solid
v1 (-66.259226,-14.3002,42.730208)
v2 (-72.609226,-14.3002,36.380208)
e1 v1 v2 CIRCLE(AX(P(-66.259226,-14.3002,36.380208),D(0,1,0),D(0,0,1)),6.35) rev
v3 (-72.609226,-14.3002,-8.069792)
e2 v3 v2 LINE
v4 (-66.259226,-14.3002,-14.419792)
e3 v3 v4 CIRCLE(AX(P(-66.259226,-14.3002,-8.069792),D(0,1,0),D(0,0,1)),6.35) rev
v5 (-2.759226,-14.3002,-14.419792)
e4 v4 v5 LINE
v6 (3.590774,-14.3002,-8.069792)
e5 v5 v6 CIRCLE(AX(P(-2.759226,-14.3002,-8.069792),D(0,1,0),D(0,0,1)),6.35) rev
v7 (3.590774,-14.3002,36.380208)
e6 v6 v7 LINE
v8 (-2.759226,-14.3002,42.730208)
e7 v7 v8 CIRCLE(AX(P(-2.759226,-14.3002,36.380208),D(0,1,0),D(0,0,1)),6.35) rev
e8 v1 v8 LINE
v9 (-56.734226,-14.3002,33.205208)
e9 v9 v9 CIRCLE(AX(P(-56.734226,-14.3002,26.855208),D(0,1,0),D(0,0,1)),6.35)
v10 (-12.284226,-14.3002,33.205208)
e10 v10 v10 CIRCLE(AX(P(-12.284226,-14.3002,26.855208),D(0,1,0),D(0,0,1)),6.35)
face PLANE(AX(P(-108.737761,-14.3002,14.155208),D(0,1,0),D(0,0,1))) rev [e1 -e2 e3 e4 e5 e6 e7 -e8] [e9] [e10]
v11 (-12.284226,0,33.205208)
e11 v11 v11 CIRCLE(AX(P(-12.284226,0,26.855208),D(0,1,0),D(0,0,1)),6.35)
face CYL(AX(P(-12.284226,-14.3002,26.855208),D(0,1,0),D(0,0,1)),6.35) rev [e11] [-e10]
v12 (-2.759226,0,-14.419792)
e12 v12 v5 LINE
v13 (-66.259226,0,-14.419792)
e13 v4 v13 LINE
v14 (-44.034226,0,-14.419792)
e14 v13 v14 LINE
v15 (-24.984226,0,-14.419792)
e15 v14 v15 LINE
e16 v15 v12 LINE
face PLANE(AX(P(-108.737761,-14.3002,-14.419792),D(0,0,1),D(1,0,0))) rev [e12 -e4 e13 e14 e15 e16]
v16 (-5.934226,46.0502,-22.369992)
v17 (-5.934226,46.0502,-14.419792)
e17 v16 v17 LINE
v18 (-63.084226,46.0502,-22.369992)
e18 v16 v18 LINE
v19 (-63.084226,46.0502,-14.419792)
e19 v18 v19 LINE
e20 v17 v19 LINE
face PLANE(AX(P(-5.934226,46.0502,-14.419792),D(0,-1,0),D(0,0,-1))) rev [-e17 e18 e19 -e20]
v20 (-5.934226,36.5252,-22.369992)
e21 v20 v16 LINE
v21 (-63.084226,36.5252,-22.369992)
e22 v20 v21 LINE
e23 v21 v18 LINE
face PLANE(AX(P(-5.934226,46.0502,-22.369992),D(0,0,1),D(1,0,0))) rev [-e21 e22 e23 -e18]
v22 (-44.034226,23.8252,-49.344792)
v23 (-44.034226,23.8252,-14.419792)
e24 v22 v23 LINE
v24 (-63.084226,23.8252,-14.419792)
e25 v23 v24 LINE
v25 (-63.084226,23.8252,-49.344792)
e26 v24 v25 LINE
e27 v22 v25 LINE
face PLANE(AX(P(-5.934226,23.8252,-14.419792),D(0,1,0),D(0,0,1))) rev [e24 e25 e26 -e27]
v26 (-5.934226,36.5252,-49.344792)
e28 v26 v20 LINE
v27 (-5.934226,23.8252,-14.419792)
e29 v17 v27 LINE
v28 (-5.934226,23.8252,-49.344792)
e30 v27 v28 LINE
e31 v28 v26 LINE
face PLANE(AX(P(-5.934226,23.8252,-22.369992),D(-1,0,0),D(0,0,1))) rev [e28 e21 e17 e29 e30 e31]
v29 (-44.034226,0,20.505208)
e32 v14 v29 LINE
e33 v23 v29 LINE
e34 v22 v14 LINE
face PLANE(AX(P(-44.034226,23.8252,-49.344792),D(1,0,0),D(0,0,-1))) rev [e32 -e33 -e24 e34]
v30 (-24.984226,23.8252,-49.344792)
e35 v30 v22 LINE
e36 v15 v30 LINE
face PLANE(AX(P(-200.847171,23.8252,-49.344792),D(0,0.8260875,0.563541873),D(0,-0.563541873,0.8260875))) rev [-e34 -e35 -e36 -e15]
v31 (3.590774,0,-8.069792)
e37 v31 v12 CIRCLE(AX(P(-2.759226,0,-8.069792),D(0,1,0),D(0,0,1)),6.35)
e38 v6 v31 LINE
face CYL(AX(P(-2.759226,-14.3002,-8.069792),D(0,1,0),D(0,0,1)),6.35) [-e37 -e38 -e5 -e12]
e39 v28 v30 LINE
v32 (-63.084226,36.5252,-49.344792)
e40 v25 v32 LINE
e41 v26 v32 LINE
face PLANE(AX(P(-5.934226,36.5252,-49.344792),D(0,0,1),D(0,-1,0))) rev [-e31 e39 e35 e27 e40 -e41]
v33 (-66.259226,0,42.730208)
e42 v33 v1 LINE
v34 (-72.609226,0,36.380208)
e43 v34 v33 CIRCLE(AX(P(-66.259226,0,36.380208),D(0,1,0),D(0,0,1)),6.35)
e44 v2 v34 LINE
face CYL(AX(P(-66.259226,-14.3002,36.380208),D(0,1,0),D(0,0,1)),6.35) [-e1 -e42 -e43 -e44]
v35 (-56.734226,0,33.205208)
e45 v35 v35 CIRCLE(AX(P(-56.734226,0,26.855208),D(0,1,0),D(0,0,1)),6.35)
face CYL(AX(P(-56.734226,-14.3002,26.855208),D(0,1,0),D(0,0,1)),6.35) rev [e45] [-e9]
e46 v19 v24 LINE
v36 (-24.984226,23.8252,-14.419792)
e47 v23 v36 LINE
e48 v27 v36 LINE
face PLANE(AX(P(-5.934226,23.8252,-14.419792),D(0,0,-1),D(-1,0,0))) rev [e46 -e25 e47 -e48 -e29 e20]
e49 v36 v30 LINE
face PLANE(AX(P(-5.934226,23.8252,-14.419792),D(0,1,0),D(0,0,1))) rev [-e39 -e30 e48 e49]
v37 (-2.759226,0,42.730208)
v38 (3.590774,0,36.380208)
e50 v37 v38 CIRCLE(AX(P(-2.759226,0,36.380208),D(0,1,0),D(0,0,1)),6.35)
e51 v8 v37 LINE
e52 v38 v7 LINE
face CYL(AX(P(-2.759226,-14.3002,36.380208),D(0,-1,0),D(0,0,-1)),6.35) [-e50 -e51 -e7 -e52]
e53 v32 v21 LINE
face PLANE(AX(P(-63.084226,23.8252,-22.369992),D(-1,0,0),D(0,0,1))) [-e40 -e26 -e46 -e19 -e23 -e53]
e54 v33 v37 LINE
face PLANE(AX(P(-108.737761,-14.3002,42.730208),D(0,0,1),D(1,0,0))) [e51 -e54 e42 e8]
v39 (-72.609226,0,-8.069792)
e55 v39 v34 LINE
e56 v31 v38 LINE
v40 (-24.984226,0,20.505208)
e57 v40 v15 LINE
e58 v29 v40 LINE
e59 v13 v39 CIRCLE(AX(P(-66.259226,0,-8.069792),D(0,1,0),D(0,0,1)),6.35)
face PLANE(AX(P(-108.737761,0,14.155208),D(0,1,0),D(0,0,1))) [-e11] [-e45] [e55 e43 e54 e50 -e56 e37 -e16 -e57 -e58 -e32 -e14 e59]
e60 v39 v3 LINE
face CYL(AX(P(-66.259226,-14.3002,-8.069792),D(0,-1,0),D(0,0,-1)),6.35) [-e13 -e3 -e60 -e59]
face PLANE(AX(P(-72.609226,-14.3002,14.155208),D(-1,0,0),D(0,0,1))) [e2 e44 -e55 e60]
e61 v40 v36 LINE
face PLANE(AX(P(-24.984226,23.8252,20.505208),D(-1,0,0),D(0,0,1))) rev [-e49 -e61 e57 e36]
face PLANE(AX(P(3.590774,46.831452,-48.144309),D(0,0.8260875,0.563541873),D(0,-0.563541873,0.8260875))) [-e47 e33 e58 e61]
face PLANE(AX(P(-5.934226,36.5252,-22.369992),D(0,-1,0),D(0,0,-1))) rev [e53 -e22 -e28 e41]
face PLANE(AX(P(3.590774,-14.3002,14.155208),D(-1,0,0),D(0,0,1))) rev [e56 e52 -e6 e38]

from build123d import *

# Parameters (mm, degrees)
SKETCH1_R               = 6.35
SKETCH1_W               = 19.05
SKETCH1_H               = 25.985863096
EXTRUDE2_DEPTH          = 14.3002
SKETCH2_W               = 19.05
SKETCH2_H               = 69.85
EXTRUDE3_DEPTH          = 23.8252
CUT_EXTRUDE1_DEPTH      = 73.599512703
CUT_EXTRUDE1_DEPTH_BACK = 73.599512703
CUT_EXTRUDE2_START      = -19.05
CUT_EXTRUDE2_DEPTH      = 19.05
EXTRUDE4_DEPTH          = 19.05
EXTRUDE4_DEPTH_BACK     = 38.1
FILLET1_R               = 6.35


# Read off the part's stored shape, not the designer's step: Cut-Extrude2
with BuildPart() as part:
    # Sketch1 → Extrude2 (new body)
    # profile 1 of 2: a face of its own
    with BuildSketch(Plane(origin=(0, 0, 0), x_dir=(1, 0, 0), z_dir=(0, 1, 0))):
        Polygon((-44.03422619, -11.566071429), (-44.03422619, 14.419791667), (-72.60922619, 14.419791667), (-72.60922619, -42.730208333), (3.59077381, -42.730208333), (3.59077381, 14.419791667), (-24.98422619, 14.419791667), (-24.98422619, -11.566071429), align=None)
        with Locations(Location((-56.73422619, -26.855208333, 0), (0, 0, 270))):
            Circle(SKETCH1_R, mode=Mode.SUBTRACT)
        with Locations(Location((-12.28422619, -26.855208333, 0), (0, 0, 270))):
            Circle(SKETCH1_R, mode=Mode.SUBTRACT)
    # profile 2 of 2: a face of its own
    with BuildSketch(Plane(origin=(0, 0, 0), x_dir=(1, 0, 0), z_dir=(0, 1, 0))):
        with Locations((-34.50922619, 1.426860119)):
            Rectangle(SKETCH1_W, SKETCH1_H)
    extrude(amount=-EXTRUDE2_DEPTH)

    # Sketch2 → Extrude3 (add)
    with BuildSketch(Plane(origin=(0, 0, 0), x_dir=(-1, 0, 0), z_dir=(0, 1, 0))):
        with Locations((34.50922619, -14.419791667)):
            Rectangle(SKETCH2_W, SKETCH2_H)
    extrude(amount=EXTRUDE3_DEPTH)

    # Sketch3 → Cut-Extrude1 (cut, two sides: drawn at the far end of the back side and taken through both)
    with BuildSketch(Plane.ZY.offset(44.03422619).offset(-CUT_EXTRUDE1_DEPTH_BACK)):
        Polygon((20.505208333, 23.8252), (-14.419791667, 23.8252), (20.505208333, 0), align=None)
    extrude(amount=CUT_EXTRUDE1_DEPTH + CUT_EXTRUDE1_DEPTH_BACK, mode=Mode.SUBTRACT)

    # Cut-Extrude2 outline → Cut-Extrude2 (cut)
    with BuildSketch(Plane.ZY.offset(44.03422619).offset(CUT_EXTRUDE2_START)):
        Polygon((-49.344791667, 0), (-14.419791667, 0), (-49.344791667, 23.8252), align=None)
    extrude(amount=CUT_EXTRUDE2_DEPTH, mode=Mode.SUBTRACT)

    # Sketch5 → Extrude4 (add, two sides: drawn at the far end of the back side and taken through both)
    with BuildSketch(Plane(origin=(-24.98422619, 0, -14.419791667), x_dir=(0, 0, -1), z_dir=(1, 0, 0)).offset(-EXTRUDE4_DEPTH_BACK)):
        Polygon((0, 23.8252), (0, 46.0502), (7.9502, 46.0502), (7.9502, 36.5252), (34.925, 36.5252), (34.925, 23.8252), align=None)
    extrude(amount=EXTRUDE4_DEPTH + EXTRUDE4_DEPTH_BACK)

    # Fillet1
    fillet1_edges = [part.edges().sort_by_distance(p)[0] for p in [
        (3.59077381, -7.1501, 42.730208333),
        (-72.60922619, -7.1501, 42.730208333),
        (-72.60922619, -7.1501, -14.419791667),
        (3.59077381, -7.1501, -14.419791667),
    ]]
    fillet(fillet1_edges, radius=FILLET1_R)


solid = part.part
